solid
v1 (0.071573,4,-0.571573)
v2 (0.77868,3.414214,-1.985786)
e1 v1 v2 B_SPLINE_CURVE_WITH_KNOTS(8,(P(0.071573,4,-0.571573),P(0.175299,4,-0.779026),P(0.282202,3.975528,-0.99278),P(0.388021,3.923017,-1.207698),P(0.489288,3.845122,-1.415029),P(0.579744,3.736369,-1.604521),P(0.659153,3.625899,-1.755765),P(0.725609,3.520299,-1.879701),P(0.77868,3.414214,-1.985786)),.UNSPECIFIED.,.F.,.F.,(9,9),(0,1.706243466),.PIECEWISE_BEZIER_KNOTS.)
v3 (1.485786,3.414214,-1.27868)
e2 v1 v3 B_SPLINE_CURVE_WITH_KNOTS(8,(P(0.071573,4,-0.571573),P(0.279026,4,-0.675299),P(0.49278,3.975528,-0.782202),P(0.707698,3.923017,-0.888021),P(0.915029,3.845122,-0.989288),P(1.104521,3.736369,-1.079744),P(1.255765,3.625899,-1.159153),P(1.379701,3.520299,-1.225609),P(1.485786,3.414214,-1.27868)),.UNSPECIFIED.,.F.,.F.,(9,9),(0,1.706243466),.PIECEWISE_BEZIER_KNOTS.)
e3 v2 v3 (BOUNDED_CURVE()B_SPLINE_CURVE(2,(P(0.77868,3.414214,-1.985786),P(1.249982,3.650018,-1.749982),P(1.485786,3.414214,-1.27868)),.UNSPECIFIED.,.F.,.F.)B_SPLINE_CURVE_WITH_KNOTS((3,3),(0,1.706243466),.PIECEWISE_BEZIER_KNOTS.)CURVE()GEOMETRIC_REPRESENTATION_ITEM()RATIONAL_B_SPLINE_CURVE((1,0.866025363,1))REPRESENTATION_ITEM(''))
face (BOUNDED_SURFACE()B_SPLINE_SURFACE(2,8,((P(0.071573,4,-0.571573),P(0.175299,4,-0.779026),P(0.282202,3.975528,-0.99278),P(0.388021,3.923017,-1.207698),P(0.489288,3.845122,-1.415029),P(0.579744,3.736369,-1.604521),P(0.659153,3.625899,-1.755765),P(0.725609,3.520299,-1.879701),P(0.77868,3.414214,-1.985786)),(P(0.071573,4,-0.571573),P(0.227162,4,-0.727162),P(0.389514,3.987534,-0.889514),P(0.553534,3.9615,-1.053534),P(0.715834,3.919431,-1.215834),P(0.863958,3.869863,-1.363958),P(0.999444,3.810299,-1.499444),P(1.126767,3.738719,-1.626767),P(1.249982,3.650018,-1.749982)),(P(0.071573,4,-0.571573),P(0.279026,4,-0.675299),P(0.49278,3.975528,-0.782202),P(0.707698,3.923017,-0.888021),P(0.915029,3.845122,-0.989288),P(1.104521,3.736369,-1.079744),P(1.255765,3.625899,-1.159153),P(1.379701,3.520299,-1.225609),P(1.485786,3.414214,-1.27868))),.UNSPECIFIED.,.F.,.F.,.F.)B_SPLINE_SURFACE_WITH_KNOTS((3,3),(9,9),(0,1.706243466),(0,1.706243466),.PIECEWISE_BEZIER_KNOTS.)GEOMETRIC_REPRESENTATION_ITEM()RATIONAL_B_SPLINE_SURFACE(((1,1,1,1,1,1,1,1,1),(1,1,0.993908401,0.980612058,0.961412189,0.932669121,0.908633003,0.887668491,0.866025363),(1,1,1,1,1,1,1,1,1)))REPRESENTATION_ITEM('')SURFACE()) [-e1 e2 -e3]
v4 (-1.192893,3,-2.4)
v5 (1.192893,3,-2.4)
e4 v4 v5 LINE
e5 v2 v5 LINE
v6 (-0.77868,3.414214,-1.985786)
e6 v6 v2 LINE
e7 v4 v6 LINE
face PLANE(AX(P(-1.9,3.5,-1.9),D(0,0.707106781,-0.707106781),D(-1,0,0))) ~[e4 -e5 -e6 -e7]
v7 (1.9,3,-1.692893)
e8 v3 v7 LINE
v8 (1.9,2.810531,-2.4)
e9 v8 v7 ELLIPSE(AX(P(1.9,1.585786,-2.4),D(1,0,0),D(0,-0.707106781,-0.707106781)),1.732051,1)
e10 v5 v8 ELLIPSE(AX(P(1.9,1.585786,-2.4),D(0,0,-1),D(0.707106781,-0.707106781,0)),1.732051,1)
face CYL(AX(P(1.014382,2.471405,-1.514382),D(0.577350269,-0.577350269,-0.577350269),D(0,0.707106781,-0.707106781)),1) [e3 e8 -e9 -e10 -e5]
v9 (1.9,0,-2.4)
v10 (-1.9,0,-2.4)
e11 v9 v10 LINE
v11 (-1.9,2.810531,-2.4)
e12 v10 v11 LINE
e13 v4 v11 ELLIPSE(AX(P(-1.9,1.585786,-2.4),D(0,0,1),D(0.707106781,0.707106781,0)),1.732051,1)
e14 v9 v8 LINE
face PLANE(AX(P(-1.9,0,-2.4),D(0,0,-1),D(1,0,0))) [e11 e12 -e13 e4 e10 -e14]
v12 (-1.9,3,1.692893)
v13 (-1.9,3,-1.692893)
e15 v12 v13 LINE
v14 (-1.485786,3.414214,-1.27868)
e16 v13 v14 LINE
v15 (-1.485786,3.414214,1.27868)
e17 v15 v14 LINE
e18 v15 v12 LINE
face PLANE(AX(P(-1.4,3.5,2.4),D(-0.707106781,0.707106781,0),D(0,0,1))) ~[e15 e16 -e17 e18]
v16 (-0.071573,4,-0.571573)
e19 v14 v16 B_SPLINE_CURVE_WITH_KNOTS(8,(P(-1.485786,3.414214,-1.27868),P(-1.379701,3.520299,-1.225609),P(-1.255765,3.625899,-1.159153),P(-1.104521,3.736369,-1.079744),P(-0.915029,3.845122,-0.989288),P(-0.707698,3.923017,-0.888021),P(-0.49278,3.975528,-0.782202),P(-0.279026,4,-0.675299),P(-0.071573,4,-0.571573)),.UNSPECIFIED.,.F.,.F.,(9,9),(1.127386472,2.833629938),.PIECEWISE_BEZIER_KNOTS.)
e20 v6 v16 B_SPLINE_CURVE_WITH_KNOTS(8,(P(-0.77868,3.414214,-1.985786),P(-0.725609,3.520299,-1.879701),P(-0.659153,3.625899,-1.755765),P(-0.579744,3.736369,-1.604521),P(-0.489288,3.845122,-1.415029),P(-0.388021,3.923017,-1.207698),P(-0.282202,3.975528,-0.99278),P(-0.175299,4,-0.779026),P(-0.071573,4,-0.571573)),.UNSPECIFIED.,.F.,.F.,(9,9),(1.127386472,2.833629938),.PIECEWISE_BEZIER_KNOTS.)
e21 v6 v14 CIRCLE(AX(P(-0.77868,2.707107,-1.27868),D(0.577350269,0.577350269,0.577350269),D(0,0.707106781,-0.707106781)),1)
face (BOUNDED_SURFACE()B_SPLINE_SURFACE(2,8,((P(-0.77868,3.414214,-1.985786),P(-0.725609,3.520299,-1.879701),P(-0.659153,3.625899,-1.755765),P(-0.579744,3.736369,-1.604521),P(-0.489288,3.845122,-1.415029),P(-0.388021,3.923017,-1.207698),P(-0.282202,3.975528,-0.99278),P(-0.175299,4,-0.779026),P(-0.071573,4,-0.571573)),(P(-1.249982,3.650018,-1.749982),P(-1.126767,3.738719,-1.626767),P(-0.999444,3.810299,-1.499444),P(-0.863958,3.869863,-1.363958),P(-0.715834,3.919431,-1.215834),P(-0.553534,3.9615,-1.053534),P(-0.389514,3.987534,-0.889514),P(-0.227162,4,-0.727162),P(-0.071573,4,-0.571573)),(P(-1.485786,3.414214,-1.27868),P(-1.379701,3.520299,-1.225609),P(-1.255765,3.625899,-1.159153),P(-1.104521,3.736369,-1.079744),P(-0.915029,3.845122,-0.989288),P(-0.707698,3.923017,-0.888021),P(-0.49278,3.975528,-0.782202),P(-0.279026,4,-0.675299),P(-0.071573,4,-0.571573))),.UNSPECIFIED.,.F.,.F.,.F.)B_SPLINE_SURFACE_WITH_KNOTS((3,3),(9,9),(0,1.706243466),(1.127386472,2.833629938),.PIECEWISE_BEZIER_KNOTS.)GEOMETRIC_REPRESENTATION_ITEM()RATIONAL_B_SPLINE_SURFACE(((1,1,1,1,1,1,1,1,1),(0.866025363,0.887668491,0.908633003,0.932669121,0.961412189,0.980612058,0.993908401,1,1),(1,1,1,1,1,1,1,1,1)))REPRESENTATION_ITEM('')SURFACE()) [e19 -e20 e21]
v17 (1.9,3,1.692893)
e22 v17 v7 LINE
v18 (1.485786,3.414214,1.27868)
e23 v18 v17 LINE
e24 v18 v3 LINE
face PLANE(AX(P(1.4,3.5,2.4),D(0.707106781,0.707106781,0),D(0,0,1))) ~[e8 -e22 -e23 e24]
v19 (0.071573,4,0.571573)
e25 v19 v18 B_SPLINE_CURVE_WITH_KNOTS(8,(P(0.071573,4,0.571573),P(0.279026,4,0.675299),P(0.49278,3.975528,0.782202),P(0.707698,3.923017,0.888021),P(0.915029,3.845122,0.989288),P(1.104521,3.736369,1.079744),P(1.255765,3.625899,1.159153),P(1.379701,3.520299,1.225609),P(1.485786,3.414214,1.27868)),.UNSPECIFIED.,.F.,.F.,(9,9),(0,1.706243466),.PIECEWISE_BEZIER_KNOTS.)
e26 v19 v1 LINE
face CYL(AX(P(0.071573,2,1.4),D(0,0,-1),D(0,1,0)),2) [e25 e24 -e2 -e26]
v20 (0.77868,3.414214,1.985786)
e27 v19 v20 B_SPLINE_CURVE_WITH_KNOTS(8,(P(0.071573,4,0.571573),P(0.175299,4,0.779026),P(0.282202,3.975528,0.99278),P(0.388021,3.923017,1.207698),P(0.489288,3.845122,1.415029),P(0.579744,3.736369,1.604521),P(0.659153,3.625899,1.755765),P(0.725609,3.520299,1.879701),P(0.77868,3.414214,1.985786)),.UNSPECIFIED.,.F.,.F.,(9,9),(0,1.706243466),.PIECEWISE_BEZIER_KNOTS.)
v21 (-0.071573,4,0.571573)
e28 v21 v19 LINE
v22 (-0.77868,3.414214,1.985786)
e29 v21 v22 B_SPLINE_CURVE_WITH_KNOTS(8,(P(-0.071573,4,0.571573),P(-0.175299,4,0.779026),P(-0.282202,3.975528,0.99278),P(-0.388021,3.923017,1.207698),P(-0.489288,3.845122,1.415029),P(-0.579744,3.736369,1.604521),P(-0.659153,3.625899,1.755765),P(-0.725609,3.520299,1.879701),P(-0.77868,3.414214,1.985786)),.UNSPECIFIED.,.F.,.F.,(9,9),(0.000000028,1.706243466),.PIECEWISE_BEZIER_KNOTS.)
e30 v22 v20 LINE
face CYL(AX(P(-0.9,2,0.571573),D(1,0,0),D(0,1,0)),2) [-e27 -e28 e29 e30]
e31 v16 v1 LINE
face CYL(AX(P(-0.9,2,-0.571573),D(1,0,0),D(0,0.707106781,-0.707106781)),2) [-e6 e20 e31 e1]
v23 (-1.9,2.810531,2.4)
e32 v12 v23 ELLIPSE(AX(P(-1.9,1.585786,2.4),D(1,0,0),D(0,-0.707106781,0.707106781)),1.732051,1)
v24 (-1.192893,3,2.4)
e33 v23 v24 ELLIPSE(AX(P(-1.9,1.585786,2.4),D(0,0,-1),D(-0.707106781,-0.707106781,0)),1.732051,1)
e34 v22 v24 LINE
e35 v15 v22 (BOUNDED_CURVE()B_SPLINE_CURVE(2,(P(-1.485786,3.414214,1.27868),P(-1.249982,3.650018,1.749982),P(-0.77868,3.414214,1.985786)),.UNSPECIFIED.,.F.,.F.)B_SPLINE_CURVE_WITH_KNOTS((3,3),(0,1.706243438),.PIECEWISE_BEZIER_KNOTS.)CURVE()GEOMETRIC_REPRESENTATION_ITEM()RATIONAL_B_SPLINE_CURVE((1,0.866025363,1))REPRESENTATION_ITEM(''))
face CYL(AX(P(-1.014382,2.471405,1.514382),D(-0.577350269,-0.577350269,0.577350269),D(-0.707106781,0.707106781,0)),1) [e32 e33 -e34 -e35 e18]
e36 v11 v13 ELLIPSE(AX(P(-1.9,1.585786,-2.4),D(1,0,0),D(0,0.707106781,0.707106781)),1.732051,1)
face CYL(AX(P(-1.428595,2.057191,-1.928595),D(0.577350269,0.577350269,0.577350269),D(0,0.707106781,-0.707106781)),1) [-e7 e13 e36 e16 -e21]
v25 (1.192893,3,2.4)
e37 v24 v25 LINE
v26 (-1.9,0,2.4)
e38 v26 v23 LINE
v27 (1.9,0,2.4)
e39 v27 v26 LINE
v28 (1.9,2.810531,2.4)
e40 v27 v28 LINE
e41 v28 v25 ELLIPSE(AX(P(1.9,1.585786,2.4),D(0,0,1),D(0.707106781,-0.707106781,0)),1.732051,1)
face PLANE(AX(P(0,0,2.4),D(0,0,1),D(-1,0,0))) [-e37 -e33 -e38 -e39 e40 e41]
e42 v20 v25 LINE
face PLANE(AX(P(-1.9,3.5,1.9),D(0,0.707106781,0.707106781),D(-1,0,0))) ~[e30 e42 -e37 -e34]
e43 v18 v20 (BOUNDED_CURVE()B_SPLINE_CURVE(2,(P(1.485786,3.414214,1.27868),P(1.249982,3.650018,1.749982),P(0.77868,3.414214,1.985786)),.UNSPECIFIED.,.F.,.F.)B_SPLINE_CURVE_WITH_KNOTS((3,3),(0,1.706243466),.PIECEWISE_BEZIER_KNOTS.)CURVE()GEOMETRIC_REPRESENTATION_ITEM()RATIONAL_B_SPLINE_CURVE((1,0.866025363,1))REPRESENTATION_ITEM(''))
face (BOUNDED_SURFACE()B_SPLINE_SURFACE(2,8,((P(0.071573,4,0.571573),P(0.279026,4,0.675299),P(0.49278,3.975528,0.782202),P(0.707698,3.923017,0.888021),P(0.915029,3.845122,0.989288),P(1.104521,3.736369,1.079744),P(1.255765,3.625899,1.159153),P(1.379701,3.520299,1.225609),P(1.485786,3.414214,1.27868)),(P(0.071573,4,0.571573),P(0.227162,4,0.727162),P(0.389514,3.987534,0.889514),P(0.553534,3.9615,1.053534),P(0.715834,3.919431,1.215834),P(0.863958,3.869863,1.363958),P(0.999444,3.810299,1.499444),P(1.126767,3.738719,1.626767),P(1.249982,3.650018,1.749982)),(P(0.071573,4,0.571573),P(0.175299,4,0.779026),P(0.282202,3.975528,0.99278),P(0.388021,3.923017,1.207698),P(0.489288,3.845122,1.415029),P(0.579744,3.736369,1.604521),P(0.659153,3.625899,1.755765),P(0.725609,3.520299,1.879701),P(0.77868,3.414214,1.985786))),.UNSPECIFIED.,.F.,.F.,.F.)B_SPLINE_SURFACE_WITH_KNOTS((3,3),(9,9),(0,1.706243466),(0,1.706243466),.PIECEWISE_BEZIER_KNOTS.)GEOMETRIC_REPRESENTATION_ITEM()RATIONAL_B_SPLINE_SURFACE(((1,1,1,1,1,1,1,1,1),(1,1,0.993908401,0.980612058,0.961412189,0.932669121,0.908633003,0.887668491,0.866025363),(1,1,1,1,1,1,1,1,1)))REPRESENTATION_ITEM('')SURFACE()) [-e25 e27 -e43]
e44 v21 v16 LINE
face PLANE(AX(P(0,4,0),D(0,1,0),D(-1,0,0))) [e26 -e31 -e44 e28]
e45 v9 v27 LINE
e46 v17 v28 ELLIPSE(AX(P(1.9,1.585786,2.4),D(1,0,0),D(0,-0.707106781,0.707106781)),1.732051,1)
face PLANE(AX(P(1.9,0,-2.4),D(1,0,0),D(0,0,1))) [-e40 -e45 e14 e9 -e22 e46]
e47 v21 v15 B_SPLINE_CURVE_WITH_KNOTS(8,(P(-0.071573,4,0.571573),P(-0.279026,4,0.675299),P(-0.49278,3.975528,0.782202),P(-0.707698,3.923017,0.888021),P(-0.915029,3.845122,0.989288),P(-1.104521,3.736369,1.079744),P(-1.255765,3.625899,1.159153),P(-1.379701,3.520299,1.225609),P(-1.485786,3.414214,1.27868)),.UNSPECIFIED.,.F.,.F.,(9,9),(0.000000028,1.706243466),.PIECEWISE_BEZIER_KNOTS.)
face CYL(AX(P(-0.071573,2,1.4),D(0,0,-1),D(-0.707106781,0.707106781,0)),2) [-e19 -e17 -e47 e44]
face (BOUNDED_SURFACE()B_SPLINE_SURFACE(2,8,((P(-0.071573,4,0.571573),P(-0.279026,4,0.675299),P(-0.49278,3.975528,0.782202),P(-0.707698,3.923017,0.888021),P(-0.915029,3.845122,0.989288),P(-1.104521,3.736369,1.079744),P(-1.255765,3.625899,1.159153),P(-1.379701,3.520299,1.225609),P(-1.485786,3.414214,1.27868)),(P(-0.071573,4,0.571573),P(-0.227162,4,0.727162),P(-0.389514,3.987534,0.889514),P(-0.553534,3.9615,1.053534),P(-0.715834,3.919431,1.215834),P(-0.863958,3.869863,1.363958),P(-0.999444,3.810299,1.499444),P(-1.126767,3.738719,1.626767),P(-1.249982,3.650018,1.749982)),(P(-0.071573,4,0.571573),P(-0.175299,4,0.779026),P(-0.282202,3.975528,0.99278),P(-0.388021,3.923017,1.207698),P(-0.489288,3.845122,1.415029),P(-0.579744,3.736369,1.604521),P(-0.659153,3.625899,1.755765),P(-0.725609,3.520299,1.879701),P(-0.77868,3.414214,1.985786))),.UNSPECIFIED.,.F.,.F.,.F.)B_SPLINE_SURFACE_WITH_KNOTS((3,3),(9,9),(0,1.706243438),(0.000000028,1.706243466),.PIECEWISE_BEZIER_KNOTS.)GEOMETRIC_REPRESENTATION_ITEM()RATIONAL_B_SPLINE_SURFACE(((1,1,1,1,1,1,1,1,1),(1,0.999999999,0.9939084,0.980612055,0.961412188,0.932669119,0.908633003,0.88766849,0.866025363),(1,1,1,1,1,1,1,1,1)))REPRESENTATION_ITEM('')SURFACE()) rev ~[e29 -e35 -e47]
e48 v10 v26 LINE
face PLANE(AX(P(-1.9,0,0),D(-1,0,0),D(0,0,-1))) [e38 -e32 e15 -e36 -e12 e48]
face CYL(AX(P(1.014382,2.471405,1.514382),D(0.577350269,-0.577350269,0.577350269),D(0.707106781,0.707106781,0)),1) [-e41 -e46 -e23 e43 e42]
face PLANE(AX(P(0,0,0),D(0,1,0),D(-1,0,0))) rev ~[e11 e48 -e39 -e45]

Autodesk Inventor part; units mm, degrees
ref_plane "YZ Plane" through (0, 0, 0) normal (1, 0, 0) x (0, 1, 0)
ref_plane "XZ Plane" through (0, 0, 0) normal (0, 1, 0) x (-1, 0, 0)
ref_plane "XY Plane" through (0, 0, 0) normal (0, 0, 1) x (1, 0, 0)
sketch "Эскиз1" plane through (0, 0, 0) normal (0, 1, 0) x (-1, 0, 0)
  line L0 (1.9, -2.4) -> (-1.9, -2.4)
  line L1 (-1.9, -2.4) -> (-1.9, 2.4)
  line L2 (-1.9, 2.4) -> (1.9, 2.4)
  line L3 (1.9, 2.4) -> (1.9, -2.4)
  line L4 (0, -2.4) -> (0, 2.4) construction
  line L5 (1.9, 0) -> (-1.9, 0) construction
  line L6 (0, -3.36) -> (0, 3.36) projected
  line L7 (2.66, 0) -> (-2.66, 0) projected
  point P0 (0, 0)
  dimension "d4" = 3.8
  dimension "d5" = 4.8
extrude "Выдавливание1" add sketch "Эскиз1" along normal blind 4
chamfer "Фаска1" distance 1 angle 45 4 edges at (1.9, 4, 0) (0, 4, 2.4) (-1.9, 4, 0) (0, 4, -2.4)
fillet "Сопряжение1" radius 2 4 edges at (0.9, 4, 0) (-0.9, 4, 0) (0, 4, 1.4) (0, 4, -1.4)
fillet "Сопряжение2" radius 1 12 edges at (0, 3.4142, -1.9858) (-1.4858, 3.4142, 0) (1.4858, 3.4142, 0) (0, 3.4142, 1.9858) (-1.6929, 3.2071, -2.1929) (-0.8369, 3.8478, -1.3369) (1.6929, 3.2071, -2.1929) (0.8369, 3.8478, -1.3369) (1.6929, 3.2071, 2.1929) (0.8369, 3.8478, 1.3369) (-1.6929, 3.2071, 2.1929) (-0.8369, 3.8478, 1.3369)
properties part number "LED2"
